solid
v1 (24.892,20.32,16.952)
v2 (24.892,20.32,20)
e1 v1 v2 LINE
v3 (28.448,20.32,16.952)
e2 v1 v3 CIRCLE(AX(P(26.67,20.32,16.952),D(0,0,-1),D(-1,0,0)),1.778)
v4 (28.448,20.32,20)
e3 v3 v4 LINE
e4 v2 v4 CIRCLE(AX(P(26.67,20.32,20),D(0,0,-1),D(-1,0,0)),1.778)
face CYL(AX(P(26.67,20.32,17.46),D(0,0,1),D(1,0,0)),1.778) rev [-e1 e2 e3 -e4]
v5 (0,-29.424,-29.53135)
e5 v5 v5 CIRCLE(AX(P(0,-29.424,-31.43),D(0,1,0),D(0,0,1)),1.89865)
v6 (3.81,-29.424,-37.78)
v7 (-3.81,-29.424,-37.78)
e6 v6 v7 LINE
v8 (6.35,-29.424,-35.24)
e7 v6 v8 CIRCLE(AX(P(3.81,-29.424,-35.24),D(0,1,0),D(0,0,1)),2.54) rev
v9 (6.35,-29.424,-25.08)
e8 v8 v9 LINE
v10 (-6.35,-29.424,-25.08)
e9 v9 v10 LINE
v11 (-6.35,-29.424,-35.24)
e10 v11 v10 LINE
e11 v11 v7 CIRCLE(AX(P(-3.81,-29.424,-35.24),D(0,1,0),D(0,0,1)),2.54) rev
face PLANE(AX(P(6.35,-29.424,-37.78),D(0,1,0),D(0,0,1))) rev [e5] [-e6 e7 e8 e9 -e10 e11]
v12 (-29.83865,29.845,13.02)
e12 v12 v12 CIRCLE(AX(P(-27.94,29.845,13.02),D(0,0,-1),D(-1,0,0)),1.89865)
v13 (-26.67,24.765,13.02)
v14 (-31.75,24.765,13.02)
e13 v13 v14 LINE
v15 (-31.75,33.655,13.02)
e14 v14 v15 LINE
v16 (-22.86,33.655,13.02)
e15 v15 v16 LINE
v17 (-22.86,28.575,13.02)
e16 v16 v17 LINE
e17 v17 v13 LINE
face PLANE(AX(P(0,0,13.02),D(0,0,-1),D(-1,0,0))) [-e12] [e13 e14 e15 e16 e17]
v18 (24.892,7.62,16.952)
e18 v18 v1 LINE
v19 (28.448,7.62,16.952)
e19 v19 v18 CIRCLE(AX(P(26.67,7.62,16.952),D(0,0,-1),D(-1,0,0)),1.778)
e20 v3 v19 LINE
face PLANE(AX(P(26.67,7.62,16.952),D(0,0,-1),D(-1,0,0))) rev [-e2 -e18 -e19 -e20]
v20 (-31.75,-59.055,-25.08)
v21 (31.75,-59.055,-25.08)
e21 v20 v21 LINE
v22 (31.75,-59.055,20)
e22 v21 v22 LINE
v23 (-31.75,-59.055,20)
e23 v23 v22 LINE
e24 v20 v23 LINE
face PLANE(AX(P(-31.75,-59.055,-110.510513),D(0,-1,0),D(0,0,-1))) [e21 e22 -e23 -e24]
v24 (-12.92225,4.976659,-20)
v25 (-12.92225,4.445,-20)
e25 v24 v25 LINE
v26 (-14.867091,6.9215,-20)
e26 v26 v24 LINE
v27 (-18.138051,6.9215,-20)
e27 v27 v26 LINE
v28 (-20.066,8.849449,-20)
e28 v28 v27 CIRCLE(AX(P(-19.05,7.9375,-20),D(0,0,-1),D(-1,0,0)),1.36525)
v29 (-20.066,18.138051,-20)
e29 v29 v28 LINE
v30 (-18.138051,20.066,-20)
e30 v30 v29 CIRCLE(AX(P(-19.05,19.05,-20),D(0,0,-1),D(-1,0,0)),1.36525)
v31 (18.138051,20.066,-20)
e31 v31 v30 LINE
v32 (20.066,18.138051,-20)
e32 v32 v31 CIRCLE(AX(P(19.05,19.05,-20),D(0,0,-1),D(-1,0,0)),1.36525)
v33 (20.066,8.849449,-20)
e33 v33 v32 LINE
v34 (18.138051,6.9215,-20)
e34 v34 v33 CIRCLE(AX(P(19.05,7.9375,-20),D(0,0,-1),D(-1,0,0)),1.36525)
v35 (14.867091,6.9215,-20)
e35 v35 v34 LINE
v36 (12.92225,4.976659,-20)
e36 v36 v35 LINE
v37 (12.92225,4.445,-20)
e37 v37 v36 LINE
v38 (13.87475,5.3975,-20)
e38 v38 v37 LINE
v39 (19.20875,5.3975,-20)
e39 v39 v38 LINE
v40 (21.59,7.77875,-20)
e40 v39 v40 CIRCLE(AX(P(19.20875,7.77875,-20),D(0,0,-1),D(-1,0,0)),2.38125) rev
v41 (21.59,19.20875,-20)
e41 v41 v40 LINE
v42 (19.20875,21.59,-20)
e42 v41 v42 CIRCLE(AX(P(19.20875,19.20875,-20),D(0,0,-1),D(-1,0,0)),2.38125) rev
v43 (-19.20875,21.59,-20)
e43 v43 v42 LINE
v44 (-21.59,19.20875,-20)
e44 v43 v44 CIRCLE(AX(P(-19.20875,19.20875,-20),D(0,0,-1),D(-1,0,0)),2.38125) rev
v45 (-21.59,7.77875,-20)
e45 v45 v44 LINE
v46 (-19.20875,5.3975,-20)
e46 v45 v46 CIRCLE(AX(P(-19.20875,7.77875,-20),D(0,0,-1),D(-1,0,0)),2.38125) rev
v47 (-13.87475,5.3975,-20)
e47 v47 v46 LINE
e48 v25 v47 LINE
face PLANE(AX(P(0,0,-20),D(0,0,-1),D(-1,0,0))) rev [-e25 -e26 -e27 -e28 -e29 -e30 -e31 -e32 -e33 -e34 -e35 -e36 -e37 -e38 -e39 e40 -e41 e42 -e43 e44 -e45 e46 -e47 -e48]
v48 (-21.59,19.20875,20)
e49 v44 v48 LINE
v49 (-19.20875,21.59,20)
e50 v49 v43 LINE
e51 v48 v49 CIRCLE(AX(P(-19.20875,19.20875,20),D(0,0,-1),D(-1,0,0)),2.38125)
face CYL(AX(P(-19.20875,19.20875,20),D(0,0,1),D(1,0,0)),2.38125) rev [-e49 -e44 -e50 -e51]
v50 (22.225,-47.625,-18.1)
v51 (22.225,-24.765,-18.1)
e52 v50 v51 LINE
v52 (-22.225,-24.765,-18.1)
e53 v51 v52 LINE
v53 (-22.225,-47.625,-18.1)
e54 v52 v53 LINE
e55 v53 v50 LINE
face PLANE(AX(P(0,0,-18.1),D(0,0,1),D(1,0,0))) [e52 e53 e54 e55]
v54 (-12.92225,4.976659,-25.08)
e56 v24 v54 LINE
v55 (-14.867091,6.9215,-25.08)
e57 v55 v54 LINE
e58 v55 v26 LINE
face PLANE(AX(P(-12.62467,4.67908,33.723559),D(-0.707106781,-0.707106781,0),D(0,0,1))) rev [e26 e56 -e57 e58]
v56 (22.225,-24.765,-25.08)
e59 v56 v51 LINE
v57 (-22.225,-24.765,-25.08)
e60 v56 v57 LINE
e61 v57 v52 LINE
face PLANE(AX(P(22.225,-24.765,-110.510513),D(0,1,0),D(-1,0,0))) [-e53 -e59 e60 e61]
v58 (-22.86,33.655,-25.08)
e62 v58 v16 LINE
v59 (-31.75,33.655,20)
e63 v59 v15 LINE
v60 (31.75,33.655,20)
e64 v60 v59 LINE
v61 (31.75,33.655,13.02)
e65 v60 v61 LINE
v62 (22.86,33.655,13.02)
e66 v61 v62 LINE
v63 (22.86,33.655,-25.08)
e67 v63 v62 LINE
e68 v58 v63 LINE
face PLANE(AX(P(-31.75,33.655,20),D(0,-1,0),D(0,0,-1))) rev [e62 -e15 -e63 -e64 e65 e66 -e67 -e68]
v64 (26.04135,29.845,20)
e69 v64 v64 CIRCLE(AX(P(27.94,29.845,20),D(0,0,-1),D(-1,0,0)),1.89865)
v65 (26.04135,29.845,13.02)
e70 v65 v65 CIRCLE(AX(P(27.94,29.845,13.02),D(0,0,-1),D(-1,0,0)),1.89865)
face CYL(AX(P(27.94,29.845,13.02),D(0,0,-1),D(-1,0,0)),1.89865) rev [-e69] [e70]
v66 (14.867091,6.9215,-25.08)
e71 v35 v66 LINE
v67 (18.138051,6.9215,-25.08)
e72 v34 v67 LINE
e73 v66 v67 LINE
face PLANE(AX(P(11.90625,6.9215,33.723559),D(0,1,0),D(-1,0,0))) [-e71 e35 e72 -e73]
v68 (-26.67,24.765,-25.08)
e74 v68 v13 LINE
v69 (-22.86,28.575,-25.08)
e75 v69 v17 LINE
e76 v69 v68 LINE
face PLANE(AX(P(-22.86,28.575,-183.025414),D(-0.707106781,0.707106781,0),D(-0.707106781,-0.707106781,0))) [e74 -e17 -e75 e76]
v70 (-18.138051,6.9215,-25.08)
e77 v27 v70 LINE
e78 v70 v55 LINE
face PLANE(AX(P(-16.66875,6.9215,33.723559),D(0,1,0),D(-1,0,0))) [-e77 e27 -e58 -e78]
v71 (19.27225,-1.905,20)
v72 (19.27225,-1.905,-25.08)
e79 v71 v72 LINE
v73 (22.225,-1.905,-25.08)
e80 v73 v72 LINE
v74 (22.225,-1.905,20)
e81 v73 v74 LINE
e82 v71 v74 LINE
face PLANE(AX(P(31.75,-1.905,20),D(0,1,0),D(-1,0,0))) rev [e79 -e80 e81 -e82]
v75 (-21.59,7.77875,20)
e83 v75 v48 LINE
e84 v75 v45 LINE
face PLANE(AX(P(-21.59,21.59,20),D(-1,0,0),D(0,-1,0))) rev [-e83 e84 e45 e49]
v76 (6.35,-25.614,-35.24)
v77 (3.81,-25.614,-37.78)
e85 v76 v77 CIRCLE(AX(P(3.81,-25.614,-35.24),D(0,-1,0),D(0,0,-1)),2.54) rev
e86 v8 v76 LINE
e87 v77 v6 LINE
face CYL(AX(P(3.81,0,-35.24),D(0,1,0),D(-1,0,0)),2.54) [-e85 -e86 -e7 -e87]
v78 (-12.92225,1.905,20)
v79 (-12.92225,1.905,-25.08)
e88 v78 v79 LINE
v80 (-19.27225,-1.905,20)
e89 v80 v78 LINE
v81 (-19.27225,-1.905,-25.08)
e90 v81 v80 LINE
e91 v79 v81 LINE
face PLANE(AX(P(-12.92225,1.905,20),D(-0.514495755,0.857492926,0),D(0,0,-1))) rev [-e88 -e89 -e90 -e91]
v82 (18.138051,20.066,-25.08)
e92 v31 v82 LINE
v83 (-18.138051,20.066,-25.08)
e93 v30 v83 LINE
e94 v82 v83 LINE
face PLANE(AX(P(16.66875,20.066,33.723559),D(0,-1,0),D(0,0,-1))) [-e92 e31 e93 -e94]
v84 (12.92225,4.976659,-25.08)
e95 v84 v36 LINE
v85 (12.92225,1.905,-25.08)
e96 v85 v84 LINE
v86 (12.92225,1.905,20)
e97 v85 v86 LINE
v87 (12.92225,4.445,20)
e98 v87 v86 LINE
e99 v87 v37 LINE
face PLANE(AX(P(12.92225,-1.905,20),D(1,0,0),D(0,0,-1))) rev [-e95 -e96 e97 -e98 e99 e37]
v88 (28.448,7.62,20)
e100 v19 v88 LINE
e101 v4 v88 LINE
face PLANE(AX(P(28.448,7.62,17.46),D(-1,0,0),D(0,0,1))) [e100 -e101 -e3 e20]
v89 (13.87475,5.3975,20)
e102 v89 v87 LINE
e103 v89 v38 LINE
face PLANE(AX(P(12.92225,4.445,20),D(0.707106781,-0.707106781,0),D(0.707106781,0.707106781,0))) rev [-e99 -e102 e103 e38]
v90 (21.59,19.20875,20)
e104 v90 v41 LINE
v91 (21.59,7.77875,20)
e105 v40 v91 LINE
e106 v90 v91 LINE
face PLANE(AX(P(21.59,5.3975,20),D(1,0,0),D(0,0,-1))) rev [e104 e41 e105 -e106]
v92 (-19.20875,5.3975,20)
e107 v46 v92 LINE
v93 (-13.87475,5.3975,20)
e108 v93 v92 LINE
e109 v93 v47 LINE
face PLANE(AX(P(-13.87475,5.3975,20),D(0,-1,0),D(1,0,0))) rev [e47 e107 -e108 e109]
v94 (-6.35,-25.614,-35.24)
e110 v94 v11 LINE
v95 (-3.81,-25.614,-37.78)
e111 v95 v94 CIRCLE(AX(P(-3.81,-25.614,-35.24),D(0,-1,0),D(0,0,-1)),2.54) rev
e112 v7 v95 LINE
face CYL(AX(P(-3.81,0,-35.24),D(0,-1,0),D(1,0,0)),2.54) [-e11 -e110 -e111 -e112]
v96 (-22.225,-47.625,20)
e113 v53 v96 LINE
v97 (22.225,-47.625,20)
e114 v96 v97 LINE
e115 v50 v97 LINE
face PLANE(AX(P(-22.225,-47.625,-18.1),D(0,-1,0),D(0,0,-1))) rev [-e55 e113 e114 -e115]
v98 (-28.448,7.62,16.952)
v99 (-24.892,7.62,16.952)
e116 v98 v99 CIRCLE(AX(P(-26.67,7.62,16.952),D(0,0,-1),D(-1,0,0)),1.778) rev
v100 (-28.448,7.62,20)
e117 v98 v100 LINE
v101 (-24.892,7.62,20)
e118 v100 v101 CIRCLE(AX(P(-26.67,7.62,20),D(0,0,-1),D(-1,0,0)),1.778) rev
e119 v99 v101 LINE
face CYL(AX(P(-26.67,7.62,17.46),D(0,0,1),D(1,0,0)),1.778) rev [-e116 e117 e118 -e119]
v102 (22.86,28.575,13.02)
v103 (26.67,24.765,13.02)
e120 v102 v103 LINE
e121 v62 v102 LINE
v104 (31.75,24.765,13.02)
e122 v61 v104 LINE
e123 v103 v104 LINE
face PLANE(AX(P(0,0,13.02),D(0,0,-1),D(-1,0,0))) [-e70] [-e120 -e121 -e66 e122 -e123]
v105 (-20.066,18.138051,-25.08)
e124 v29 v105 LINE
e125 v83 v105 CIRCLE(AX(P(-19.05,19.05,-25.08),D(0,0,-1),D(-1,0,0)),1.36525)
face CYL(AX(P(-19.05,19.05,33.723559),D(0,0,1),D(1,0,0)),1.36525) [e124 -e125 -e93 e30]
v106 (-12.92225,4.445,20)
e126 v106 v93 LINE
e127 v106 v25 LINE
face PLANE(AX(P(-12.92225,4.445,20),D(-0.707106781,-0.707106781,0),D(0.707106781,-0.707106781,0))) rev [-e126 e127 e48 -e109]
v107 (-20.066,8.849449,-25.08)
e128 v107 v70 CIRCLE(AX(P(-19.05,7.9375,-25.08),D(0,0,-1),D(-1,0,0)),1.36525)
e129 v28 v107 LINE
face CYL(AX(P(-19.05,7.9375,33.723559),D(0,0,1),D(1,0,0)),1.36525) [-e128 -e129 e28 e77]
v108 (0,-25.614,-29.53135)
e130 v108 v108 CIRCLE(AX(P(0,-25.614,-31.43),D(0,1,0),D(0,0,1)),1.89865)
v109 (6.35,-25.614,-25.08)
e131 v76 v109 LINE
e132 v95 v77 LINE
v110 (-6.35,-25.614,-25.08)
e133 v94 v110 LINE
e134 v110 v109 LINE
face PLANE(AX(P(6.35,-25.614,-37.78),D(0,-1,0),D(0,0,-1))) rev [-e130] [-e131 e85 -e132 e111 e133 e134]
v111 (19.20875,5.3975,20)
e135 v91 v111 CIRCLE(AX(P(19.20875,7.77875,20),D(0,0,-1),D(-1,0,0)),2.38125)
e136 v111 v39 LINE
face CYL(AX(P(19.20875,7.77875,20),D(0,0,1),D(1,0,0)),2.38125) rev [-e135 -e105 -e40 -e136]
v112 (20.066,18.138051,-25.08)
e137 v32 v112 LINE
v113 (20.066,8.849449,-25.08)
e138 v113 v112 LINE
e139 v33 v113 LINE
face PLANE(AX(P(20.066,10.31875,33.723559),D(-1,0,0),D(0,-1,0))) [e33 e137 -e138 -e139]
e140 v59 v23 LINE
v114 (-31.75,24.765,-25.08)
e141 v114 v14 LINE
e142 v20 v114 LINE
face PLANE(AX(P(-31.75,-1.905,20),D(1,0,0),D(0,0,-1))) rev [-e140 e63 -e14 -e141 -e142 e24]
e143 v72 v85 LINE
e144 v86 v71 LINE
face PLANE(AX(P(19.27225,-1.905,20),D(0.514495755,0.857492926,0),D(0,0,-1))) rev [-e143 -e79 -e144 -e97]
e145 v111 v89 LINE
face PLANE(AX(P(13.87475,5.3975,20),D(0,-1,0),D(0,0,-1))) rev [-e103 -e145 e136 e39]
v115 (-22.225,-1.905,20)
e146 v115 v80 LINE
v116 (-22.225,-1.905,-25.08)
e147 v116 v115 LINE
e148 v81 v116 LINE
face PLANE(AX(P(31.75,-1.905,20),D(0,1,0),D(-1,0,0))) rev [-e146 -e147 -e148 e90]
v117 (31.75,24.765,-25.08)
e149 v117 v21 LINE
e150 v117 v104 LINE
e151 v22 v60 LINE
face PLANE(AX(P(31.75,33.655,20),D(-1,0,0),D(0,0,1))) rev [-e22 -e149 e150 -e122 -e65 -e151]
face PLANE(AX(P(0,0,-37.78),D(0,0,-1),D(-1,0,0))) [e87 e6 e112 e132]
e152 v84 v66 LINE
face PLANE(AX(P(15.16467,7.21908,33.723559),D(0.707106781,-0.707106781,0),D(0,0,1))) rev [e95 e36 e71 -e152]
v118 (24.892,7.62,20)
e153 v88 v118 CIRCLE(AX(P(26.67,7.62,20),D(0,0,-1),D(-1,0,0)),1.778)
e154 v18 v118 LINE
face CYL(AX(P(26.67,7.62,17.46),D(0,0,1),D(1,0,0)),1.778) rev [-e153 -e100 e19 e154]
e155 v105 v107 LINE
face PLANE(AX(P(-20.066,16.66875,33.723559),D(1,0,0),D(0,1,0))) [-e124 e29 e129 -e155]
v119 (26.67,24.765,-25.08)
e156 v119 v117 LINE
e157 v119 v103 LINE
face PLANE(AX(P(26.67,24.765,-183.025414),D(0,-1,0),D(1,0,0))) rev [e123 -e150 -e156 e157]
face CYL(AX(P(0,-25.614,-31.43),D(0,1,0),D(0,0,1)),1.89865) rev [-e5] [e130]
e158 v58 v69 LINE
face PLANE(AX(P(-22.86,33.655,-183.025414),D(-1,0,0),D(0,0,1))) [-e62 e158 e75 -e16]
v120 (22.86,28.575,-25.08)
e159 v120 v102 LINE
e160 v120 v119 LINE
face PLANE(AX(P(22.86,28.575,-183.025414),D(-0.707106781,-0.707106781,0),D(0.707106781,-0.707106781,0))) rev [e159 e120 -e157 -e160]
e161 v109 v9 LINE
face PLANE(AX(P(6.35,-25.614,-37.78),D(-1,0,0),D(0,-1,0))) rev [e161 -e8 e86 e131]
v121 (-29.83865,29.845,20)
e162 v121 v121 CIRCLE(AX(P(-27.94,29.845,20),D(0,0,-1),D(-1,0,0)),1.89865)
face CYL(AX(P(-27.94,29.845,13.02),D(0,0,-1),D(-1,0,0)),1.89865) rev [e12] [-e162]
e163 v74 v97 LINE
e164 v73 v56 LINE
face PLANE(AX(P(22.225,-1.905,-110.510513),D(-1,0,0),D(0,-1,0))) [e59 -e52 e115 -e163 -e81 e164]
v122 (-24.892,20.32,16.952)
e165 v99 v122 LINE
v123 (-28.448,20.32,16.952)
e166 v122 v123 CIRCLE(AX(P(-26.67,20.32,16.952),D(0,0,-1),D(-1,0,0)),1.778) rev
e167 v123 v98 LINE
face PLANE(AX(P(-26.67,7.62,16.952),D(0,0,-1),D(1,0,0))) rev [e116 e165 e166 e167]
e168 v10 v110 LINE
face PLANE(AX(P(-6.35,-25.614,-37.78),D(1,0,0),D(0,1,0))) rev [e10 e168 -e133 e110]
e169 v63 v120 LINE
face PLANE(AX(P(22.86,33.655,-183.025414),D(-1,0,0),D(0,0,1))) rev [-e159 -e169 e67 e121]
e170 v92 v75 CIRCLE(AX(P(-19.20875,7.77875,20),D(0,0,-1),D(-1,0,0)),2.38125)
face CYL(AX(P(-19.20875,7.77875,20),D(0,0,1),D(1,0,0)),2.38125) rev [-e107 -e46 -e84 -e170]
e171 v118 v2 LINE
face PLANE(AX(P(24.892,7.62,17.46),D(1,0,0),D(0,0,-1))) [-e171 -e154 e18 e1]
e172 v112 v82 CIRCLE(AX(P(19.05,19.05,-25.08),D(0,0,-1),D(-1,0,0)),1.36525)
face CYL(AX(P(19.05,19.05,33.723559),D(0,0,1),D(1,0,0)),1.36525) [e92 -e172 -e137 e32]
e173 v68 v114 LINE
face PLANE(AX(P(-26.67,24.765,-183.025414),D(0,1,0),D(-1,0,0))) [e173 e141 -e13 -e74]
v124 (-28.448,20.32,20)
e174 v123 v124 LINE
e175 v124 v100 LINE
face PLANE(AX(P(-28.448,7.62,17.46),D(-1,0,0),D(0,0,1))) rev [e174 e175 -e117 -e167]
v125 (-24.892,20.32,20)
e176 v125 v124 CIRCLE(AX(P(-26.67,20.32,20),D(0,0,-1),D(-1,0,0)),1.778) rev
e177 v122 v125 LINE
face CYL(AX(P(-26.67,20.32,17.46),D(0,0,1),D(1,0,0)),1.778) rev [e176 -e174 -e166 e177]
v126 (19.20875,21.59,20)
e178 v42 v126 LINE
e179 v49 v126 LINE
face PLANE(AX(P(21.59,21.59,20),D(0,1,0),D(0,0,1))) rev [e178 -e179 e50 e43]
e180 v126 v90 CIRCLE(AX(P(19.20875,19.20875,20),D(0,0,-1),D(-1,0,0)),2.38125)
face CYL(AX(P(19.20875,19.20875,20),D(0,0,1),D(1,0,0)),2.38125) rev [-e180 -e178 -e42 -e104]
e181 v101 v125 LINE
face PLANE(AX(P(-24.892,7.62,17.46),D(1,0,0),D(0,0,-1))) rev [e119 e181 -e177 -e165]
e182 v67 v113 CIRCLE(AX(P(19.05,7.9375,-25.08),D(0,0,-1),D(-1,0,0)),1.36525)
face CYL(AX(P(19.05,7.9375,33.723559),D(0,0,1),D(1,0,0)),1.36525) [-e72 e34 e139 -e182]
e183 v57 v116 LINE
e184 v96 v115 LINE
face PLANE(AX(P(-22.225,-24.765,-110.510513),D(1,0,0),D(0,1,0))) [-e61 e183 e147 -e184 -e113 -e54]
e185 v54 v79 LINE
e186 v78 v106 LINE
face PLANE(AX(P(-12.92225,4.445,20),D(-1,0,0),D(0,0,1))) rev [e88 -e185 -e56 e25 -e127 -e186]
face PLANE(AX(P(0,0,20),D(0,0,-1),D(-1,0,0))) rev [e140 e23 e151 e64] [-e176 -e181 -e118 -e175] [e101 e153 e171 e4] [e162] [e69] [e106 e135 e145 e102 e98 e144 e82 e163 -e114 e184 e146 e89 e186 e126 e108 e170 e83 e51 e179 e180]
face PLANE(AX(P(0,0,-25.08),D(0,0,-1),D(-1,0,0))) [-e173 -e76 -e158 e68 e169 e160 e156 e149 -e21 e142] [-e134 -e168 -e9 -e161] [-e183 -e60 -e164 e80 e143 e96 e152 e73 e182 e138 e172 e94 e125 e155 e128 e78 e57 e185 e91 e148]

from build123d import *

# Parameters (mm, degrees)
BOSS_EXTRU_1_DEPTH      = 20
CONG_1_R                = 2.38125
ESQUISSE2_W             = 63.5
ESQUISSE2_H             = 35.56
BOSS_EXTRU_2_DEPTH      = 5.08
EMPREINTE1_START        = -25.08
EMPREINTE1_DEPTH        = 5.08
D_PLACER_START          = -25.08
D_PLACER_LA_FACE1_DEPTH = 5.08
EMPREINTE4_START        = 17.46
EMPREINTE4_DEPTH        = 2.54
D_PLACER_START_2        = 16.952
D_PLACER_LA_FACE2_DEPTH = 3.048
CHANFREIN1_SIZE         = 6.35
CHANFREIN1_SIZE2        = 3.81
CHANFREIN2_SIZE         = 3.81
CHANFREIN2_SIZE2        = 6.35
BOSS_EXTRU_3_DEPTH      = 45.08
ESQUISSE4_W             = 44.45
ESQUISSE4_H             = 22.86
ENL_V_MAT_EXTRU_1_DEPTH = 38.1
ESQUISSE5_W             = 12.7
ESQUISSE5_H             = 3.81
BOSS_EXTRU_4_DEPTH      = 12.7
CONG_2_R                = 2.54
D_GAGEMENT_61_D         = 3.7973
ENL_V_START             = -38.1
ENL_V_MAT_EXTRU_2_DEPTH = 119.894566185
D_GAGEMENT_62_D         = 3.7973
D_GAGEMENT_62_DEPTH     = 18.796
D_GAGEMENT_62_TIP       = 1.140824014


# Read off the part's stored shape, not the designer's step: Empreinte1, Déplacer la face1, Empreinte4, Déplacer la face2
with BuildPart() as part:
    # Esquisse1 → Boss.-Extru.1 (new, symmetric)
    with BuildSketch(Plane.XY):
        Polygon((-31.75, -1.905), (-31.75, 33.655), (31.75, 33.655), (31.75, -1.905), (12.92225, -1.905), (12.92225, 4.445), (13.87475, 5.3975), (21.59, 5.3975), (21.59, 21.59), (-21.59, 21.59), (-21.59, 5.3975), (-13.87475, 5.3975), (-12.92225, 4.445), (-12.92225, -1.905), align=None)
    extrude(amount=BOSS_EXTRU_1_DEPTH, both=True)

    # Congé1
    cong_1_edges = [part.edges().sort_by_distance(p)[0] for p in [
        (21.59, 5.3975, 0),
        (21.59, 21.59, 0),
        (-21.59, 21.59, 0),
        (-21.59, 5.3975, 0),
    ]]
    fillet(cong_1_edges, radius=CONG_1_R)

    # Esquisse2 → Boss.-Extru.2 (add)
    with BuildSketch(Plane(origin=(0, 0, -20), x_dir=(-1, 0, 0), z_dir=(0, 0, -1))):
        with Locations((0, 15.875)):
            Rectangle(ESQUISSE2_W, ESQUISSE2_H)
    extrude(amount=BOSS_EXTRU_2_DEPTH)

    # Empreinte1 outline → Empreinte1 (cut)
    with BuildSketch(Plane.XY.offset(EMPREINTE1_START)):
        with BuildLine():
            Line((14.44625, 7.9375), (16.66875, 7.9375))
            ThreePointArc((16.66875, 7.9375), (17.366201977, 9.621298023), (19.05, 10.31875))
            Line((19.05, 10.31875), (19.05, 16.66875))
            ThreePointArc((19.05, 16.66875), (17.366201977, 17.366201977), (16.66875, 19.05))
            Line((16.66875, 19.05), (-16.66875, 19.05))
            ThreePointArc((-16.66875, 19.05), (-17.366201977, 17.366201977), (-19.05, 16.66875))
            Line((-19.05, 16.66875), (-19.05, 10.31875))
            ThreePointArc((-19.05, 10.31875), (-17.366201977, 9.621298023), (-16.66875, 7.9375))
            Line((-16.66875, 7.9375), (-14.44625, 7.9375))
            Line((-14.44625, 7.9375), (-11.90625, 5.3975))
            Line((-11.90625, 5.3975), (-11.90625, -1.905))
            Line((-11.90625, -1.905), (11.90625, -1.905))
            Line((11.90625, -1.905), (11.90625, 5.3975))
            Line((11.90625, 5.3975), (14.44625, 7.9375))
        make_face()
    extrude(amount=EMPREINTE1_DEPTH, mode=Mode.SUBTRACT)

    # Déplacer la face1 outline → Déplacer la face1 (cut)
    with BuildSketch(Plane.XY.offset(D_PLACER_START)):
        with BuildLine():
            Line((-14.867090979, 6.9215), (-12.92225, 4.976659021))
            Line((-12.92225, 4.976659021), (-12.92225, -1.905))
            Line((-12.92225, -1.905), (-11.90625, -1.905))
            Line((-11.90625, -1.905), (-11.90625, 5.3975))
            Line((-11.90625, 5.3975), (-14.44625, 7.9375))
            Line((-14.44625, 7.9375), (-16.66875, 7.9375))
            ThreePointArc((-16.66875, 7.9375), (-17.366201977, 9.621298023), (-19.05, 10.31875))
            Line((-19.05, 10.31875), (-19.05, 16.66875))
            ThreePointArc((-19.05, 16.66875), (-17.366201977, 17.366201977), (-16.66875, 19.05))
            Line((-16.66875, 19.05), (16.66875, 19.05))
            ThreePointArc((16.66875, 19.05), (17.366201977, 17.366201977), (19.05, 16.66875))
            Line((19.05, 16.66875), (19.05, 10.31875))
            ThreePointArc((19.05, 10.31875), (17.366201977, 9.621298023), (16.66875, 7.9375))
            Line((16.66875, 7.9375), (14.44625, 7.9375))
            Line((14.44625, 7.9375), (11.90625, 5.3975))
            Line((11.90625, 5.3975), (11.90625, -1.905))
            Line((11.90625, -1.905), (12.92225, -1.905))
            Line((12.92225, -1.905), (12.92225, 4.976659021))
            Line((12.92225, 4.976659021), (14.867090979, 6.9215))
            Line((14.867090979, 6.9215), (18.13805068, 6.9215))
            ThreePointArc((18.13805068, 6.9215), (18.084622467, 8.902877533), (20.066, 8.84944932))
            Line((20.066, 8.84944932), (20.066, 18.13805068))
            ThreePointArc((20.066, 18.13805068), (18.084622467, 18.084622467), (18.13805068, 20.066))
            Line((18.13805068, 20.066), (-18.13805068, 20.066))
            ThreePointArc((-18.13805068, 20.066), (-18.084622467, 18.084622467), (-20.066, 18.13805068))
            Line((-20.066, 18.13805068), (-20.066, 8.84944932))
            ThreePointArc((-20.066, 8.84944932), (-18.084622467, 8.902877533), (-18.13805068, 6.9215))
            Line((-18.13805068, 6.9215), (-14.867090979, 6.9215))
        make_face()
    extrude(amount=D_PLACER_LA_FACE1_DEPTH, mode=Mode.SUBTRACT)

    # Empreinte4 outline → Empreinte4 (cut)
    with BuildSketch(Plane.XY.offset(EMPREINTE4_START)):
        with BuildLine():
            ThreePointArc((-27.94, 7.62), (-26.67, 6.35), (-25.4, 7.62))
            Line((-25.4, 7.62), (-25.4, 20.32))
            ThreePointArc((-25.4, 20.32), (-26.67, 21.59), (-27.94, 20.32))
            Line((-27.94, 20.32), (-27.94, 7.62))
        make_face()
        with BuildLine():
            Line((25.4, 20.32), (25.4, 7.62))
            ThreePointArc((25.4, 7.62), (26.67, 6.35), (27.94, 7.62))
            Line((27.94, 7.62), (27.94, 20.32))
            ThreePointArc((27.94, 20.32), (26.67, 21.59), (25.4, 20.32))
        make_face()
    extrude(amount=EMPREINTE4_DEPTH, mode=Mode.SUBTRACT)

    # Déplacer la face2 outline → Déplacer la face2 (cut)
    with BuildSketch(Plane.XY.offset(D_PLACER_START_2)):
        with BuildLine():
            ThreePointArc((-28.448, 7.62), (-26.67, 5.842), (-24.892, 7.62))
            Line((-24.892, 7.62), (-24.892, 20.32))
            ThreePointArc((-24.892, 20.32), (-26.67, 22.098), (-28.448, 20.32))
            Line((-28.448, 20.32), (-28.448, 7.62))
        make_face()
        with BuildLine():
            Line((24.892, 20.32), (24.892, 7.62))
            ThreePointArc((24.892, 7.62), (26.67, 5.842), (28.448, 7.62))
            Line((28.448, 7.62), (28.448, 20.32))
            ThreePointArc((28.448, 20.32), (26.67, 22.098), (24.892, 20.32))
        make_face()
    extrude(amount=D_PLACER_LA_FACE2_DEPTH, mode=Mode.SUBTRACT)

    # Chanfrein1
    chanfrein1_edges = [part.edges().sort_by_distance(p)[0] for p in [
        (-12.92225, -1.905, -2.54),
    ]]
    chanfrein1_side = [part.faces().sort_by_distance(p)[0] for p in [
        (-22.336125, -1.905, -2.54),
    ]]
    chamfer(chanfrein1_edges, length=CHANFREIN1_SIZE, length2=CHANFREIN1_SIZE2, reference=chanfrein1_side[0])

    # Chanfrein2
    chanfrein2_edges = [part.edges().sort_by_distance(p)[0] for p in [
        (12.92225, -1.905, -2.54),
    ]]
    chanfrein2_side = [part.faces().sort_by_distance(p)[0] for p in [
        (12.92225, 1.302160596, -2.726935132),
    ]]
    chamfer(chanfrein2_edges, length=CHANFREIN2_SIZE, length2=CHANFREIN2_SIZE2, reference=chanfrein2_side[0])

    # Esquisse3 → Boss.-Extru.3 (add)
    with BuildSketch(Plane.XY.offset(20)):
        Polygon((-31.75, -1.905), (-31.75, -59.055), (31.75, -59.055), (31.75, -1.905), (22.225, -1.905), (22.225, -24.765), (-22.225, -24.765), (-22.225, -1.905), align=None)
    extrude(amount=-BOSS_EXTRU_3_DEPTH)

    # Esquisse4 → Enlèv. mat.-Extru.1 (cut)
    with BuildSketch(Plane.XY.offset(20)):
        with Locations((0, -36.195)):
            Rectangle(ESQUISSE4_W, ESQUISSE4_H)
    extrude(amount=-ENL_V_MAT_EXTRU_1_DEPTH, mode=Mode.SUBTRACT)

    # Esquisse5 → Boss.-Extru.4 (add)
    with BuildSketch(Plane(origin=(0, 0, -25.08), x_dir=(-1, 0, 0), z_dir=(0, 0, -1))):
        with Locations((0, -27.519)):
            Rectangle(ESQUISSE5_W, ESQUISSE5_H)
    extrude(amount=BOSS_EXTRU_4_DEPTH)

    # Congé2
    cong_2_edges = [part.edges().sort_by_distance(p)[0] for p in [
        (6.35, -27.519, -37.78),
        (-6.35, -27.519, -37.78),
    ]]
    fillet(cong_2_edges, radius=CONG_2_R)

    # Dégagement #61 (through all)
    with Locations(Plane(origin=(0, -25.614, 0), x_dir=(1, 0, 0), z_dir=(0, 1, 0))):
        with Locations((0, 31.43)):
            Hole(D_GAGEMENT_61_D / 2)

    # Esquisse8 → Enlèv. mat.-Extru.2 (cut)
    with BuildSketch(Plane(origin=(0, 0, -25.08), x_dir=(-1, 0, 0), z_dir=(0, 0, -1)).offset(ENL_V_START)):
        Polygon((266.493356743, 33.655), (31.75, 33.655), (22.86, 33.655), (22.86, 28.575), (26.67, 24.765), (31.75, 24.765), (266.493356743, 24.765), (735.980070228, 24.765), (735.980070228, 33.655), align=None)
    enl_v_mat_extru_2 = extrude(amount=ENL_V_MAT_EXTRU_2_DEPTH, mode=Mode.SUBTRACT)

    # Symétrie1: Enlèv. mat.-Extru.2 across plane
    add(enl_v_mat_extru_2.mirror(Plane(origin=(0, 0, 0), x_dir=(0, 0, 1), z_dir=(1, 0, 0))), mode=Mode.SUBTRACT)

    # Dégagement #62
    with Locations(Plane(origin=(0, 0, 13.02), x_dir=(-1, 0, 0), z_dir=(0, 0, -1))):
        with Locations((27.94, 29.845), (-27.94, 29.845)):
            Hole(D_GAGEMENT_62_D / 2, depth=D_GAGEMENT_62_DEPTH)
            with Locations((0, 0, -(D_GAGEMENT_62_DEPTH + D_GAGEMENT_62_TIP / 2))):  # 118° drill point
                Cone(0, D_GAGEMENT_62_D / 2, D_GAGEMENT_62_TIP, mode=Mode.SUBTRACT)


solid = part.part
